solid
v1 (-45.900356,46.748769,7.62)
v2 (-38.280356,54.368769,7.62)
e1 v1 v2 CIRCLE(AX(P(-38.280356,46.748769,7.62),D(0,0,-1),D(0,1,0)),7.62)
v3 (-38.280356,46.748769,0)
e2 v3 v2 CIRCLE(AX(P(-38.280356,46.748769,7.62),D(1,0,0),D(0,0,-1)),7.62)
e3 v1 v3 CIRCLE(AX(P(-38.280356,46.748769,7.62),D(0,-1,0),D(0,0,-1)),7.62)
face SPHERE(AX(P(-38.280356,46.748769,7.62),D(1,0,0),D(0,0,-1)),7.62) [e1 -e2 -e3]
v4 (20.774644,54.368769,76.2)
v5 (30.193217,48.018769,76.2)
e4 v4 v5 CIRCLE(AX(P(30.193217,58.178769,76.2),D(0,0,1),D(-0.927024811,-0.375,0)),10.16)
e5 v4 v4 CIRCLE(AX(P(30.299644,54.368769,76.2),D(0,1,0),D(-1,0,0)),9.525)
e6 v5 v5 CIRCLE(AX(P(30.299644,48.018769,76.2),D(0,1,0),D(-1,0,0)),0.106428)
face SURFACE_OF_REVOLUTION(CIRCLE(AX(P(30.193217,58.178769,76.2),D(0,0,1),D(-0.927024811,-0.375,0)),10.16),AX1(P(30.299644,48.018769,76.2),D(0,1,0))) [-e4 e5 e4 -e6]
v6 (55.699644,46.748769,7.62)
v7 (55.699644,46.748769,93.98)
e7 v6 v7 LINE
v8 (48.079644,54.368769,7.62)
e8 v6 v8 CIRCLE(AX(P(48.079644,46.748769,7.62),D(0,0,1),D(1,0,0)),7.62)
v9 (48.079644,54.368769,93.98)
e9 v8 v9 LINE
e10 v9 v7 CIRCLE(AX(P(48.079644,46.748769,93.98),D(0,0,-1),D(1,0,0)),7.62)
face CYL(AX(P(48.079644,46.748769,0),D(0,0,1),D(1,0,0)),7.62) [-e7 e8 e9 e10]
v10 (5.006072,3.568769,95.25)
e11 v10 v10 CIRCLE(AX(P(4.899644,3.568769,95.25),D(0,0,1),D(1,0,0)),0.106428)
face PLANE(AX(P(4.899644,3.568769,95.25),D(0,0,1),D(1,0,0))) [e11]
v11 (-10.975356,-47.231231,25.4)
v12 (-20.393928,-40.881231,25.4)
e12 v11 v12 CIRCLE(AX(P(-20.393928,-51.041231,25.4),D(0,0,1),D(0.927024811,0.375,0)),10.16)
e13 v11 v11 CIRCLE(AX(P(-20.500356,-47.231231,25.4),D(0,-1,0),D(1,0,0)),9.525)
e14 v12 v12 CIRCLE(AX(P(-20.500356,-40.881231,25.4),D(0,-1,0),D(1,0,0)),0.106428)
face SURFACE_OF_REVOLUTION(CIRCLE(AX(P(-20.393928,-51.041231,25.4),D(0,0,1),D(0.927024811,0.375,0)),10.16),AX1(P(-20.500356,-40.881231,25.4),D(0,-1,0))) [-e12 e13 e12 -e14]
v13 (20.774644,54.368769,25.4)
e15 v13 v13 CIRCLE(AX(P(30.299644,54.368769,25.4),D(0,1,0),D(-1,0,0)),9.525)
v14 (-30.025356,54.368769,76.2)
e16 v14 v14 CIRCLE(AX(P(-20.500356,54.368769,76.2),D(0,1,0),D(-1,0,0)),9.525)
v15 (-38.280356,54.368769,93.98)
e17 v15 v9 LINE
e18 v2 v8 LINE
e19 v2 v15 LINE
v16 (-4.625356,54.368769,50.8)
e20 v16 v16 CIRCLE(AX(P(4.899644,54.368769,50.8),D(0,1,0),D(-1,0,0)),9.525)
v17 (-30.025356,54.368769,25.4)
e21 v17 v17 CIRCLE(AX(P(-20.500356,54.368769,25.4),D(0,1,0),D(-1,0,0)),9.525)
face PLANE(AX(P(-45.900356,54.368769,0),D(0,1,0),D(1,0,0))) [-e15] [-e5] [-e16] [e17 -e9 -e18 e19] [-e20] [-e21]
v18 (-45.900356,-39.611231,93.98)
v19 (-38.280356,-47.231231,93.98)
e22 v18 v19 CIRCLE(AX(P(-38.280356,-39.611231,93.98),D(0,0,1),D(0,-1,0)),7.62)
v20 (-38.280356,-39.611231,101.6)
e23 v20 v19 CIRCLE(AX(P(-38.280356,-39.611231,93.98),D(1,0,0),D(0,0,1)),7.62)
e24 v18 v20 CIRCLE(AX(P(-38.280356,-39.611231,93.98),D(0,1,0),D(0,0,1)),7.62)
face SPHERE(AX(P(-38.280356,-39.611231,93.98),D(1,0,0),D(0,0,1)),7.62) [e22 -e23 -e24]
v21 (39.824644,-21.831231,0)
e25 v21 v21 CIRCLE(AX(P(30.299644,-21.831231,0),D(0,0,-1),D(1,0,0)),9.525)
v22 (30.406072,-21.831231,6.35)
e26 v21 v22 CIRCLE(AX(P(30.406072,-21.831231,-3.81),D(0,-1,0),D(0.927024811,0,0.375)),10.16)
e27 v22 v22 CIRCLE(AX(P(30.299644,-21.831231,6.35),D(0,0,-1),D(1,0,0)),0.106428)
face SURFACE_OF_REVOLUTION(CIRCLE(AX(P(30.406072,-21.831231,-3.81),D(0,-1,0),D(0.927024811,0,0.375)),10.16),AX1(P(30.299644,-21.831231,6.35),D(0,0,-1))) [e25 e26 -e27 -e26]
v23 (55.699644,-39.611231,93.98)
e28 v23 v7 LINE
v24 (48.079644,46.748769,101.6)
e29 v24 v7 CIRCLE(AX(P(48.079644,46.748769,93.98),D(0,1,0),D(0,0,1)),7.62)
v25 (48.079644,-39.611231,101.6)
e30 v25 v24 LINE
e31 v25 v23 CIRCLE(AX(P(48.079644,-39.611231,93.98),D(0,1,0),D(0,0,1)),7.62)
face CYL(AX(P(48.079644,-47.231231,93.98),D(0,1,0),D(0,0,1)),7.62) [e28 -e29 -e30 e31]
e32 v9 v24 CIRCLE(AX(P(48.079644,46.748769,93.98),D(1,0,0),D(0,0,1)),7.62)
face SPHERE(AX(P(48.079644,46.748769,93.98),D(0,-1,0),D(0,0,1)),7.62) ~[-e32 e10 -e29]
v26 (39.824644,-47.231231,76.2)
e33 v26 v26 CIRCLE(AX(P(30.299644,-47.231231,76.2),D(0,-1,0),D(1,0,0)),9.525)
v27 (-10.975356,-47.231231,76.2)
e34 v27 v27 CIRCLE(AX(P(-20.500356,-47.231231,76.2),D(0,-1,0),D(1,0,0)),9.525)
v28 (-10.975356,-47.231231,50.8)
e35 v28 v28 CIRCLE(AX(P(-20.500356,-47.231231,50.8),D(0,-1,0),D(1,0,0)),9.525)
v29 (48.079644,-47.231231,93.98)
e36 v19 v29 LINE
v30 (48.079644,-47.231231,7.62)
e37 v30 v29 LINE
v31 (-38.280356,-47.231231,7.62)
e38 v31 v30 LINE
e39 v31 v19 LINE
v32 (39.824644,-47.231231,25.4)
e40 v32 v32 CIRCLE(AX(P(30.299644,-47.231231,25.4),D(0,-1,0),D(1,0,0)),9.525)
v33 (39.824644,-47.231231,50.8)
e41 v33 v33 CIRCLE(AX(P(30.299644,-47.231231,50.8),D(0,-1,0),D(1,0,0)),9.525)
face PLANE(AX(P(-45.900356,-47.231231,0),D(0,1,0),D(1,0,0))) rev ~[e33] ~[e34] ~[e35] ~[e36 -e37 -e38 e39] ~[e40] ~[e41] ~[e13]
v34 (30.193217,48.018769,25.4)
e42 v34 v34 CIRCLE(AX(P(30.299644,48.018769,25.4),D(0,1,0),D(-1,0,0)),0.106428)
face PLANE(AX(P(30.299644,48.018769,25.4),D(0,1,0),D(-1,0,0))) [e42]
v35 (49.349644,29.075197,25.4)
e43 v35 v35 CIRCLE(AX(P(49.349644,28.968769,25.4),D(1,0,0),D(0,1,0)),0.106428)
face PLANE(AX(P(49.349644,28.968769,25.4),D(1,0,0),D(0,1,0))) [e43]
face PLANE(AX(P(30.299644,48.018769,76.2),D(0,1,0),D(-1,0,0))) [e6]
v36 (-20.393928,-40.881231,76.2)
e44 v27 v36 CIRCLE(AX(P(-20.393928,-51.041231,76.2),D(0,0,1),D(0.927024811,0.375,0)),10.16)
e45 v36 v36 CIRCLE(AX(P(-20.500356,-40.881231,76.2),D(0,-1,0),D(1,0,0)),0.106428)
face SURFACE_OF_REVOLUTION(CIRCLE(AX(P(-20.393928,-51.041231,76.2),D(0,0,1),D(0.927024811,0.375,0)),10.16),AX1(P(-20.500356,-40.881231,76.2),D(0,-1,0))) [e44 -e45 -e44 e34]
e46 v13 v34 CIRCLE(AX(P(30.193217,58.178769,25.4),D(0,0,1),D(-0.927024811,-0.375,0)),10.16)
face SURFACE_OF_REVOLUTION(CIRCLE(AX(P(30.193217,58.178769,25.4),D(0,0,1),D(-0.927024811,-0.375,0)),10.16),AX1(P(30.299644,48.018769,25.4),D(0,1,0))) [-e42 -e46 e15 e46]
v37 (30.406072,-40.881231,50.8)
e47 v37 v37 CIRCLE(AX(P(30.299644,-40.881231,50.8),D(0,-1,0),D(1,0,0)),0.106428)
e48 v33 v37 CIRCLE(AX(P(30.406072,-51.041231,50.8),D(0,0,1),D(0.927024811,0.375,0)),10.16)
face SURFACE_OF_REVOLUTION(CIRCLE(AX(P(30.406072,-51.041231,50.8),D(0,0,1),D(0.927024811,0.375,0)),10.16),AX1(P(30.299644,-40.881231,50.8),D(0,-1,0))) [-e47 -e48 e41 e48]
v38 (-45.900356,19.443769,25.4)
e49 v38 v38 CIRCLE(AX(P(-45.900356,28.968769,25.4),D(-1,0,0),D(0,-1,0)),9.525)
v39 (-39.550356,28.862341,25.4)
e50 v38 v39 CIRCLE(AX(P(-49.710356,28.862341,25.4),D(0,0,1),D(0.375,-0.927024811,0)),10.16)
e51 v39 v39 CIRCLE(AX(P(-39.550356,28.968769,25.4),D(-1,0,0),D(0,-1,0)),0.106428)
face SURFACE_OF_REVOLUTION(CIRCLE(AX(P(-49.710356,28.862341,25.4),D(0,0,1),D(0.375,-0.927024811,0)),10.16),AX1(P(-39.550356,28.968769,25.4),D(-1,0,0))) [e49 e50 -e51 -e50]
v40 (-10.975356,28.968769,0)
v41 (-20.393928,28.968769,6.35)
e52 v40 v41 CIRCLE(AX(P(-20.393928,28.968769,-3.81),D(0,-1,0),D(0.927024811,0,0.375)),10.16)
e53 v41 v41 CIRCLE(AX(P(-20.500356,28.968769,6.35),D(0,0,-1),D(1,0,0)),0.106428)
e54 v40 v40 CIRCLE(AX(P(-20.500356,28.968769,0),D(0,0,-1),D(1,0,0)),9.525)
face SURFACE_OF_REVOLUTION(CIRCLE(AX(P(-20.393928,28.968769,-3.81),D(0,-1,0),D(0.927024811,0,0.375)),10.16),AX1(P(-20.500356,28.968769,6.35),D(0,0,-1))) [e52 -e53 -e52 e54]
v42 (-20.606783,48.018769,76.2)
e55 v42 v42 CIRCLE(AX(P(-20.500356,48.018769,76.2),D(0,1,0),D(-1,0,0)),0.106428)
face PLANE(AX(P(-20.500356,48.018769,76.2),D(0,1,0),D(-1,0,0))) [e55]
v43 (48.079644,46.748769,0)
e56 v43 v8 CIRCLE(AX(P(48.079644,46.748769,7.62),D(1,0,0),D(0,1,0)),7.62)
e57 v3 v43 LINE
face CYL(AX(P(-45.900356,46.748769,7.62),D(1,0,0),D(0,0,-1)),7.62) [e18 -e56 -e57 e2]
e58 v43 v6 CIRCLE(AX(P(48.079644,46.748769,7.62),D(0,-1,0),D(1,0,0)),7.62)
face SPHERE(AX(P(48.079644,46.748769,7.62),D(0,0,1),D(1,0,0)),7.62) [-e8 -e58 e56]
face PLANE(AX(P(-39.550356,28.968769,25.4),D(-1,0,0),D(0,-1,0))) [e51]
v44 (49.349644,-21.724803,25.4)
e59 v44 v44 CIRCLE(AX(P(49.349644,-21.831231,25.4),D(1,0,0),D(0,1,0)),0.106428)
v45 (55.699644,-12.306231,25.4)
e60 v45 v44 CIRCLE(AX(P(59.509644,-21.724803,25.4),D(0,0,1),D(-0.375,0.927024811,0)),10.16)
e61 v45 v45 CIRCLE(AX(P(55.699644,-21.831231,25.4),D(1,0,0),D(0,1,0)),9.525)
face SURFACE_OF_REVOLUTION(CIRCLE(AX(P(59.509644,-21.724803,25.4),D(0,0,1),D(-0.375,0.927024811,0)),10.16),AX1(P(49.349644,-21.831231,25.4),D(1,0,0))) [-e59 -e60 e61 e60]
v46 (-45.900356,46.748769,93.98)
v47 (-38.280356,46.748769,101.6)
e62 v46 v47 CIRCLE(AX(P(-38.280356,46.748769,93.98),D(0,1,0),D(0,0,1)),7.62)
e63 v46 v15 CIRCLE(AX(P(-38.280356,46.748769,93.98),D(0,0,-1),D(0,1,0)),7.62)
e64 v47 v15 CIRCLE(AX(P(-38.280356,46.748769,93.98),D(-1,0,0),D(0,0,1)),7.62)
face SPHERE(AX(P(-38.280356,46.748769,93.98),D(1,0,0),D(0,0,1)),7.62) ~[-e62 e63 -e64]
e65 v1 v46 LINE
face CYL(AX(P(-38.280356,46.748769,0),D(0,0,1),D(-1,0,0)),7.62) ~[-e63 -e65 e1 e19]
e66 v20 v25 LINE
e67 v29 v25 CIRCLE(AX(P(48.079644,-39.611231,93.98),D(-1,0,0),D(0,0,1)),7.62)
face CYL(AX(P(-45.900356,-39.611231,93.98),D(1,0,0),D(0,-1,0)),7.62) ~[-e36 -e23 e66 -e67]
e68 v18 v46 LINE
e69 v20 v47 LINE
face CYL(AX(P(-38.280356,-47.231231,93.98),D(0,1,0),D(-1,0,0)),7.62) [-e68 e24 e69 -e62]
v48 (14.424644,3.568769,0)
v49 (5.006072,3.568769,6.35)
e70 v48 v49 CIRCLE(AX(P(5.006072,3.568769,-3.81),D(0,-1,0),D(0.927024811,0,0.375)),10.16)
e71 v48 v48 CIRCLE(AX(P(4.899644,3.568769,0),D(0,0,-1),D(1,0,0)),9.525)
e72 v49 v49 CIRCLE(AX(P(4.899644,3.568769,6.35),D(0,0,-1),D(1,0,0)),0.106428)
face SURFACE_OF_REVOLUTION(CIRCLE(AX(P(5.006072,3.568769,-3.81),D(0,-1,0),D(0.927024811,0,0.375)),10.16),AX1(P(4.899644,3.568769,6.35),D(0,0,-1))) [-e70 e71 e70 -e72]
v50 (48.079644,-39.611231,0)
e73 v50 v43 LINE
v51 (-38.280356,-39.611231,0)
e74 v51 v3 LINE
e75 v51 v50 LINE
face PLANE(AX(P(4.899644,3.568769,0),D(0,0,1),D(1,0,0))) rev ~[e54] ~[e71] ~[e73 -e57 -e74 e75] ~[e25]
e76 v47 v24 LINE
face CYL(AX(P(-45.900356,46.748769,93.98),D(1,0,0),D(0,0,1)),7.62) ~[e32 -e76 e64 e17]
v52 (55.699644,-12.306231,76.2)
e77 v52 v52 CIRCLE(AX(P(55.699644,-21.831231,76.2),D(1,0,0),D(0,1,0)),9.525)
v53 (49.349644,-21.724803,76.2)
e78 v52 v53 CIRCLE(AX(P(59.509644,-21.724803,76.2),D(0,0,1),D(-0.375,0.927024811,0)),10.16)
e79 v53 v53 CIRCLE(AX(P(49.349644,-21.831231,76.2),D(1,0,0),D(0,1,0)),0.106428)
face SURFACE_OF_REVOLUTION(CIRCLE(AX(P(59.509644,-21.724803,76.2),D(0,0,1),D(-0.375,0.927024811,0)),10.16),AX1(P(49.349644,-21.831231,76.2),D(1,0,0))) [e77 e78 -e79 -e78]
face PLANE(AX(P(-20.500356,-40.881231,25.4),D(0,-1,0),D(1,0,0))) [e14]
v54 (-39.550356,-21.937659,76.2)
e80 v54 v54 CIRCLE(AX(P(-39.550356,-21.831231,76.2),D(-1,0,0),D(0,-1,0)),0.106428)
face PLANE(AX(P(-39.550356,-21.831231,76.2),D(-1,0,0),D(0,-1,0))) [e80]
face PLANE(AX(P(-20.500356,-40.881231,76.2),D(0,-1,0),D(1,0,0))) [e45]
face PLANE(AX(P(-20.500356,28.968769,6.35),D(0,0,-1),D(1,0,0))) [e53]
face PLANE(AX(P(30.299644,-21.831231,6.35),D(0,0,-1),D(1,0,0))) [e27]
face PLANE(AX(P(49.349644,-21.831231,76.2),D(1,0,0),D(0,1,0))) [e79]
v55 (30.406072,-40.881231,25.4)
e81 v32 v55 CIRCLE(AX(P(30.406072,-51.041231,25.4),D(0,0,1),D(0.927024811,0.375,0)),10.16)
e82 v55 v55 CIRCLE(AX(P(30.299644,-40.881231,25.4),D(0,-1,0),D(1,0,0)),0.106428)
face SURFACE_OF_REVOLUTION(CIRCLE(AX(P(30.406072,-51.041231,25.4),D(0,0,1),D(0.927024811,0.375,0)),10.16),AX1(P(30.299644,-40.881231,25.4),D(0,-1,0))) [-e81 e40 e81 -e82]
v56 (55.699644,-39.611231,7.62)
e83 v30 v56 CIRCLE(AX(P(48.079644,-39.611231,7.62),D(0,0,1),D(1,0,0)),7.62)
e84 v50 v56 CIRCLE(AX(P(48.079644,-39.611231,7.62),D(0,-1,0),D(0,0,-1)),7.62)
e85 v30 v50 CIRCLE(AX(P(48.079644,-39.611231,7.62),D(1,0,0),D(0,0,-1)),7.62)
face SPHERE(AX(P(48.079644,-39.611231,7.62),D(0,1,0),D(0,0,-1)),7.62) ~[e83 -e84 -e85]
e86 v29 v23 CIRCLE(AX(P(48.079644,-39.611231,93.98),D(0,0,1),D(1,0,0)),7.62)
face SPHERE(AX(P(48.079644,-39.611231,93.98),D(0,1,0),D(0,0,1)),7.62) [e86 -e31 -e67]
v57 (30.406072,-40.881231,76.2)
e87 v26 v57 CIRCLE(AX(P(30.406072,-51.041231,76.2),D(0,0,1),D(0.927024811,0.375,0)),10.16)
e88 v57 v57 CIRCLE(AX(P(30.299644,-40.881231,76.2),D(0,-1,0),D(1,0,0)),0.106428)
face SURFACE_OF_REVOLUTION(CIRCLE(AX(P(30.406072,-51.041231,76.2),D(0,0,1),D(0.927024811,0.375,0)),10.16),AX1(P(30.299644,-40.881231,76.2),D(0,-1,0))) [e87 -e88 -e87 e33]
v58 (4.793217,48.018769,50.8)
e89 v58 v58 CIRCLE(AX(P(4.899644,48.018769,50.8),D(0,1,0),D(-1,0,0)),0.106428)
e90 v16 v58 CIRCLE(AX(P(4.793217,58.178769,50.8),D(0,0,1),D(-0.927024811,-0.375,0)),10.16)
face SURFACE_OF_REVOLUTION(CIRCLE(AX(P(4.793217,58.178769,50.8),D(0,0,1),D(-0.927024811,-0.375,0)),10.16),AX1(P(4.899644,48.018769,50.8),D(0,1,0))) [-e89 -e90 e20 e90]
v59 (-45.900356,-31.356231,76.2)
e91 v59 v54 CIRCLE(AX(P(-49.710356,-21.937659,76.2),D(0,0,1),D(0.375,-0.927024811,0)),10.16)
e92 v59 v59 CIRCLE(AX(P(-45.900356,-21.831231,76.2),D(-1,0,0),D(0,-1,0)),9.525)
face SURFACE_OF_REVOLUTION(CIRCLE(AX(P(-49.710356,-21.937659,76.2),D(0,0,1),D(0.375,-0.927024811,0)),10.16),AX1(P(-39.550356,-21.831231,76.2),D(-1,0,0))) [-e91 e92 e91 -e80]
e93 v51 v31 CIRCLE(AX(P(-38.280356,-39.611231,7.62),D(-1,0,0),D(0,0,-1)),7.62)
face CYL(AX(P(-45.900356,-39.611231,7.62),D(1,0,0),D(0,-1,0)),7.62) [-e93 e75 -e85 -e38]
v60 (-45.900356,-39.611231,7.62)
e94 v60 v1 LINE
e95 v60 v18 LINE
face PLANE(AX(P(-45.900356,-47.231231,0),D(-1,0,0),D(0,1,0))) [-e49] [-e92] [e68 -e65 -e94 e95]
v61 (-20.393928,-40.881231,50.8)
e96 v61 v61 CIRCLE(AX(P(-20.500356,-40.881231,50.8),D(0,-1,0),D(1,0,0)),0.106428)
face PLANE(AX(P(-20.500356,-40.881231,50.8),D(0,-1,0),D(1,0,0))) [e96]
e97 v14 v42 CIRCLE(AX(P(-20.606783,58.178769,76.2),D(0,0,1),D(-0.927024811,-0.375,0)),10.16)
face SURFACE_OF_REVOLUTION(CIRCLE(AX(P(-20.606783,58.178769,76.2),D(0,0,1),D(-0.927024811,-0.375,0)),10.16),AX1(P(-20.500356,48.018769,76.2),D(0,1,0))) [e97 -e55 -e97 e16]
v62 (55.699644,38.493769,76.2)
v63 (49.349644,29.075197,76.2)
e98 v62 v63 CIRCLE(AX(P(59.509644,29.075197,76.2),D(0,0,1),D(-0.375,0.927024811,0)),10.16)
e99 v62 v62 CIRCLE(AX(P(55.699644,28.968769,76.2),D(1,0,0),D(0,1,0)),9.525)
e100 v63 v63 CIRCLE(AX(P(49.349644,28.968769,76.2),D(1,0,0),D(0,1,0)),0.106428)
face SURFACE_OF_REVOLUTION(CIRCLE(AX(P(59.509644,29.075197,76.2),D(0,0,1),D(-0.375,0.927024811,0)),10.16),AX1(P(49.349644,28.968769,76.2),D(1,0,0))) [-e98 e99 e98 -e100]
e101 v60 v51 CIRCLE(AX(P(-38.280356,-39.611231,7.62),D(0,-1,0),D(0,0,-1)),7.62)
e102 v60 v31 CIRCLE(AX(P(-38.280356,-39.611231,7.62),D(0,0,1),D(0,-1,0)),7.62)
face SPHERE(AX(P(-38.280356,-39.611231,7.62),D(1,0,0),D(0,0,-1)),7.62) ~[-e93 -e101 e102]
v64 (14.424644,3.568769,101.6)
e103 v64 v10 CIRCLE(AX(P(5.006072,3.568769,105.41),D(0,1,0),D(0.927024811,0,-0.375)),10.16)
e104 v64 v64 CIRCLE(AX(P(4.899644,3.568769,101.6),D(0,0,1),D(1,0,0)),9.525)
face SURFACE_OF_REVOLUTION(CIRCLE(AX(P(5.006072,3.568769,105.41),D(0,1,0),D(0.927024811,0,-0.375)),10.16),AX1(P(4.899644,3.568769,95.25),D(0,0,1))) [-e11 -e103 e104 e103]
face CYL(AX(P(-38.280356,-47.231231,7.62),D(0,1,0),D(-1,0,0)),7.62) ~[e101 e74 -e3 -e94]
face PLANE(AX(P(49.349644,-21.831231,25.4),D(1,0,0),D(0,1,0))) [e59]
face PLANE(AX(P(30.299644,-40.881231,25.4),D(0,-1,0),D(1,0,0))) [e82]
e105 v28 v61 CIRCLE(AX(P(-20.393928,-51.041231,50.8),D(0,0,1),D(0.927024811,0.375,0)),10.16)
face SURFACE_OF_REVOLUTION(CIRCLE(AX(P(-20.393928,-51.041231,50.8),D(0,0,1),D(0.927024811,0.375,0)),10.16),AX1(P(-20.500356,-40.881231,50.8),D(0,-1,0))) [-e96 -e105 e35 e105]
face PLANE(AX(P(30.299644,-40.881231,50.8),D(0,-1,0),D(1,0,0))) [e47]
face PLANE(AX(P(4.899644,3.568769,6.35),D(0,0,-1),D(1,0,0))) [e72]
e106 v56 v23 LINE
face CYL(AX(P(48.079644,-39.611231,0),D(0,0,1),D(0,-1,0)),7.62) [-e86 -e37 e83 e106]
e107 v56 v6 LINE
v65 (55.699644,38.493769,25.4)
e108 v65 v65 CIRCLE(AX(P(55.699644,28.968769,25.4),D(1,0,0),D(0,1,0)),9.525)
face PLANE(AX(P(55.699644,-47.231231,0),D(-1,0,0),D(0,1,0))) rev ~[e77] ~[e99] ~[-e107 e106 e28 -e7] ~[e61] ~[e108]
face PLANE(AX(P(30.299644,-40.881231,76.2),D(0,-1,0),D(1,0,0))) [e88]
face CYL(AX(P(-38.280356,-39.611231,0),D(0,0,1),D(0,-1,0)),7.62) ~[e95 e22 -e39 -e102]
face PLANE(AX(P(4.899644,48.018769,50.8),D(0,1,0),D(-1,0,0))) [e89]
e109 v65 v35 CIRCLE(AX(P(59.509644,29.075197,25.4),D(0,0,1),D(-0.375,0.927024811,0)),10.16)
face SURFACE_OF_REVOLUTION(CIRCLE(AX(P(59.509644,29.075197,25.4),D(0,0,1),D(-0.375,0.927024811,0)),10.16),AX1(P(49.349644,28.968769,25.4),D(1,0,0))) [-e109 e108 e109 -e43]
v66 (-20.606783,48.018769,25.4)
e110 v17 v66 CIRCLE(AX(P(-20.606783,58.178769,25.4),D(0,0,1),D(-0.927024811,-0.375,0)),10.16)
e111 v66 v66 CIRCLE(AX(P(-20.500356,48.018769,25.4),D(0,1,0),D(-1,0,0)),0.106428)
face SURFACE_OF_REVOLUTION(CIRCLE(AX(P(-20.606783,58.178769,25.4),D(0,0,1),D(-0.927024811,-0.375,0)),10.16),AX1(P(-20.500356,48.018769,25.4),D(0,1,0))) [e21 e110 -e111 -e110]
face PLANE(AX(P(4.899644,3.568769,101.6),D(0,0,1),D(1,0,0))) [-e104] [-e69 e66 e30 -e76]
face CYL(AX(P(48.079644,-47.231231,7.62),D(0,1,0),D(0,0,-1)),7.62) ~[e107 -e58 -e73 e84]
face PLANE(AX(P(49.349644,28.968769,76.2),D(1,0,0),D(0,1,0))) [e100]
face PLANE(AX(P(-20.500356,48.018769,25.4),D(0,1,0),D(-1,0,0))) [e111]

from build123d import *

# Parameters (mm, degrees)
F0_W      = 101.6
F0_H      = 101.6
F0_R      = 9.525
F1_DEPTH  = 101.6
F2_R      = 9.525
F3_DEPTH  = 6.35
F5_R      = 9.525
F6_DEPTH  = 6.35
F8_R      = 9.525
F9_DEPTH  = 6.35
F11_R     = 9.525
F12_DEPTH = 6.35
F14_R     = 9.525
F15_DEPTH = 6.35
F17_R     = 9.525
F18_DEPTH = 6.35
F20_R     = 7.62


# Not quite as in the source:
# - a fillet or chamfer that OpenCascade refuses, or shapes differently, is made with other operations: its cross-section is extruded or revolved along the edge and cut away or added


with BuildPart() as f1:
    # F0 (on Top) → F1 (new body)
    with BuildSketch(Plane.XY):
        with Locations((4.8996444777, 3.5687691152)):
            Rectangle(F0_W, F0_H)
        with Locations((4.8996444777, 3.5687691152)):
            Circle(F0_R, mode=Mode.SUBTRACT)
        with Locations((4.8996444777, 3.5687691152)):
            Circle(F0_R)
    extrude(amount=F1_DEPTH)

    # F2 (on face) → F3 (cut)
    with BuildSketch(Plane.XY.offset(101.6)):
        with Locations((4.8996444777, 3.5687691152)):
            Circle(F2_R)
    extrude(amount=-F3_DEPTH, mode=Mode.SUBTRACT)

    # F4: fillet of radius 10.16 on 1 edges, made by hand

    # F4_s1 → F4_t2 (revolve)
    with BuildSketch(Plane.XZ.offset(-3.5687691152)):
        with BuildLine():
            ThreePointArc((14.4246444777, 101.6), (10.685685062, 96.9857730325), (5.0060723991, 95.25))
            Line((5.0060723991, 95.25), (14.4246444777, 95.25))
            Line((14.4246444777, 95.25), (14.4246444777, 101.6))
        make_face()
    revolve(axis=Axis((4.8996444777, 3.5687691152, 95.25), (0, 0, 1)))

    # F5 (on face) → F6 (cut)
    with BuildSketch(Plane(origin=(-45.9003555223, 0, 0), x_dir=(0, -1, 0), z_dir=(-1, 0, 0))):
        with Locations((-28.9687691152, 25.4)):
            Circle(F5_R)
        with Locations((21.8312308848, 76.2)):
            Circle(F5_R)
    extrude(amount=-F6_DEPTH, mode=Mode.SUBTRACT)

    # F7: fillet of radius 10.16 on 2 edges, made by hand

    # F7_s1 → F7_t2 (revolve)
    with BuildSketch(Plane.XY.offset(25.4)):
        with BuildLine():
            ThreePointArc((-45.9003555223, 19.4437691152), (-41.2861285547, 23.182728531), (-39.5503555223, 28.8623411938))
            Line((-39.5503555223, 28.8623411938), (-39.5503555223, 19.4437691152))
            Line((-39.5503555223, 19.4437691152), (-45.9003555223, 19.4437691152))
        make_face()
    revolve(axis=Axis((-39.5503555223, 28.9687691152, 25.4), (-1, 0, 0)))

    # F7_s3 → F7_t4 (revolve)
    with BuildSketch(Plane.XY.offset(76.2)):
        with BuildLine():
            ThreePointArc((-45.9003555223, -31.3562308848), (-41.2861285547, -27.617271469), (-39.5503555223, -21.9376588062))
            Line((-39.5503555223, -21.9376588062), (-39.5503555223, -31.3562308848))
            Line((-39.5503555223, -31.3562308848), (-45.9003555223, -31.3562308848))
        make_face()
    revolve(axis=Axis((-39.5503555223, -21.8312308848, 76.2), (-1, 0, 0)))

    # F8 (on face) → F9 (cut)
    with BuildSketch(Plane(origin=(0, 0, 0), x_dir=(1, 0, 0), z_dir=(0, 0, -1))):
        with Locations((4.8996444777, -3.5687691152)):
            Circle(F8_R)
        with Locations((30.2996444777, 21.8312308848)):
            Circle(F8_R)
        with Locations((-20.5003555223, -28.9687691152)):
            Circle(F8_R)
    extrude(amount=-F9_DEPTH, mode=Mode.SUBTRACT)

    # F10: fillet of radius 10.16 on 3 edges, made by hand

    # F10_s1 → F10_t2 (revolve)
    with BuildSketch(Plane.XZ.offset(-28.9687691152)):
        with BuildLine():
            ThreePointArc((-10.9753555223, 0), (-14.714314938, 4.6142269675), (-20.3939276009, 6.35))
            Line((-20.3939276009, 6.35), (-10.9753555223, 6.35))
            Line((-10.9753555223, 6.35), (-10.9753555223, 0))
        make_face()
    revolve(axis=Axis((-20.5003555223, 28.9687691152, 6.35), (0, 0, -1)))

    # F10_s3 → F10_t4 (revolve)
    with BuildSketch(Plane.XZ.offset(-3.5687691152)):
        with BuildLine():
            ThreePointArc((14.4246444777, 0), (10.685685062, 4.6142269675), (5.0060723991, 6.35))
            Line((5.0060723991, 6.35), (14.4246444777, 6.35))
            Line((14.4246444777, 6.35), (14.4246444777, 0))
        make_face()
    revolve(axis=Axis((4.8996444777, 3.5687691152, 6.35), (0, 0, -1)))

    # F10_s5 → F10_t6 (revolve)
    with BuildSketch(Plane.XZ.offset(21.8312308848)):
        with BuildLine():
            ThreePointArc((39.8246444777, 0), (36.085685062, 4.6142269675), (30.4060723991, 6.35))
            Line((30.4060723991, 6.35), (39.8246444777, 6.35))
            Line((39.8246444777, 6.35), (39.8246444777, 0))
        make_face()
    revolve(axis=Axis((30.2996444777, -21.8312308848, 6.35), (0, 0, -1)))

    # F11 (on face) → F12 (cut)
    with BuildSketch(Plane.YZ.offset(55.6996444777)):
        with Locations((-21.8312308848, 25.4)):
            Circle(F11_R)
        with Locations((-21.8312308848, 76.2)):
            Circle(F11_R)
        with Locations((28.9687691152, 25.4)):
            Circle(F11_R)
        with Locations((28.9687691152, 76.2)):
            Circle(F11_R)
    extrude(amount=-F12_DEPTH, mode=Mode.SUBTRACT)

    # F13: fillet of radius 10.16 on 4 edges, made by hand

    # F13_s1 → F13_t2 (revolve)
    with BuildSketch(Plane.XY.offset(25.4)):
        with BuildLine():
            ThreePointArc((55.6996444777, 38.4937691152), (51.0854175102, 34.7548096994), (49.3496444777, 29.0751970366))
            Line((49.3496444777, 29.0751970366), (49.3496444777, 38.4937691152))
            Line((49.3496444777, 38.4937691152), (55.6996444777, 38.4937691152))
        make_face()
    revolve(axis=Axis((49.3496444777, 28.9687691152, 25.4), (1, 0, 0)))

    # F13_s3 → F13_t4 (revolve)
    with BuildSketch(Plane.XY.offset(76.2)):
        with BuildLine():
            ThreePointArc((55.6996444777, 38.4937691152), (51.0854175102, 34.7548096994), (49.3496444777, 29.0751970366))
            Line((49.3496444777, 29.0751970366), (49.3496444777, 38.4937691152))
            Line((49.3496444777, 38.4937691152), (55.6996444777, 38.4937691152))
        make_face()
    revolve(axis=Axis((49.3496444777, 28.9687691152, 76.2), (1, 0, 0)))

    # F13_s5 → F13_t6 (revolve)
    with BuildSketch(Plane.XY.offset(76.2)):
        with BuildLine():
            ThreePointArc((55.6996444777, -12.3062308848), (51.0854175102, -16.0451903006), (49.3496444777, -21.7248029634))
            Line((49.3496444777, -21.7248029634), (49.3496444777, -12.3062308848))
            Line((49.3496444777, -12.3062308848), (55.6996444777, -12.3062308848))
        make_face()
    revolve(axis=Axis((49.3496444777, -21.8312308848, 76.2), (1, 0, 0)))

    # F13_s7 → F13_t8 (revolve)
    with BuildSketch(Plane.XY.offset(25.4)):
        with BuildLine():
            ThreePointArc((55.6996444777, -12.3062308848), (51.0854175102, -16.0451903006), (49.3496444777, -21.7248029634))
            Line((49.3496444777, -21.7248029634), (49.3496444777, -12.3062308848))
            Line((49.3496444777, -12.3062308848), (55.6996444777, -12.3062308848))
        make_face()
    revolve(axis=Axis((49.3496444777, -21.8312308848, 25.4), (1, 0, 0)))

    # F14 (on face) → F15 (cut)
    with BuildSketch(Plane(origin=(0, 54.3687691152, 0), x_dir=(-1, 0, 0), z_dir=(0, 1, 0))):
        with Locations((-4.8996444777, 50.8)):
            Circle(F14_R)
        with Locations((-30.2996444777, 25.4)):
            Circle(F14_R)
        with Locations((20.5003555223, 76.2)):
            Circle(F14_R)
        with Locations((-30.2996444777, 76.2)):
            Circle(F14_R)
        with Locations((20.5003555223, 25.4)):
            Circle(F14_R)
    extrude(amount=-F15_DEPTH, mode=Mode.SUBTRACT)

    # F16: fillet of radius 10.16 on 5 edges, made by hand

    # F16_s1 → F16_t2 (revolve)
    with BuildSketch(Plane.XY.offset(25.4)):
        with BuildLine():
            ThreePointArc((-30.0253555223, 54.3687691152), (-26.2863961065, 49.7545421477), (-20.6067834436, 48.0187691152))
            Line((-20.6067834436, 48.0187691152), (-30.0253555223, 48.0187691152))
            Line((-30.0253555223, 48.0187691152), (-30.0253555223, 54.3687691152))
        make_face()
    revolve(axis=Axis((-20.5003555223, 48.0187691152, 25.4), (0, 1, 0)))

    # F16_s3 → F16_t4 (revolve)
    with BuildSketch(Plane.XY.offset(50.8)):
        with BuildLine():
            ThreePointArc((-4.6253555223, 54.3687691152), (-0.8863961065, 49.7545421477), (4.7932165564, 48.0187691152))
            Line((4.7932165564, 48.0187691152), (-4.6253555223, 48.0187691152))
            Line((-4.6253555223, 48.0187691152), (-4.6253555223, 54.3687691152))
        make_face()
    revolve(axis=Axis((4.8996444777, 48.0187691152, 50.8), (0, 1, 0)))

    # F16_s5 → F16_t6 (revolve)
    with BuildSketch(Plane.XY.offset(76.2)):
        with BuildLine():
            ThreePointArc((-30.0253555223, 54.3687691152), (-26.2863961065, 49.7545421477), (-20.6067834436, 48.0187691152))
            Line((-20.6067834436, 48.0187691152), (-30.0253555223, 48.0187691152))
            Line((-30.0253555223, 48.0187691152), (-30.0253555223, 54.3687691152))
        make_face()
    revolve(axis=Axis((-20.5003555223, 48.0187691152, 76.2), (0, 1, 0)))

    # F16_s7 → F16_t8 (revolve)
    with BuildSketch(Plane.XY.offset(76.2)):
        with BuildLine():
            ThreePointArc((20.7746444777, 54.3687691152), (24.5136038935, 49.7545421477), (30.1932165564, 48.0187691152))
            Line((30.1932165564, 48.0187691152), (20.7746444777, 48.0187691152))
            Line((20.7746444777, 48.0187691152), (20.7746444777, 54.3687691152))
        make_face()
    revolve(axis=Axis((30.2996444777, 48.0187691152, 76.2), (0, 1, 0)))

    # F16_s9 → F16_t10 (revolve)
    with BuildSketch(Plane.XY.offset(25.4)):
        with BuildLine():
            ThreePointArc((20.7746444777, 54.3687691152), (24.5136038935, 49.7545421477), (30.1932165564, 48.0187691152))
            Line((30.1932165564, 48.0187691152), (20.7746444777, 48.0187691152))
            Line((20.7746444777, 48.0187691152), (20.7746444777, 54.3687691152))
        make_face()
    revolve(axis=Axis((30.2996444777, 48.0187691152, 25.4), (0, 1, 0)))

    # F17 (on face) → F18 (cut)
    with BuildSketch(Plane.XZ.offset(47.2312308848)):
        with Locations((30.2996444777, 25.4)):
            Circle(F17_R)
        with Locations((30.2996444777, 50.8)):
            Circle(F17_R)
        with Locations((30.2996444777, 76.2)):
            Circle(F17_R)
        with Locations((-20.5003555223, 25.4)):
            Circle(F17_R)
        with Locations((-20.5003555223, 50.8)):
            Circle(F17_R)
        with Locations((-20.5003555223, 76.2)):
            Circle(F17_R)
    extrude(amount=-F18_DEPTH, mode=Mode.SUBTRACT)

    # F19: fillet of radius 10.16 on 6 edges, made by hand

    # F19_s1 → F19_t2 (revolve)
    with BuildSketch(Plane.XY.offset(25.4)):
        with BuildLine():
            ThreePointArc((39.8246444777, -47.2312308848), (36.085685062, -42.6170039173), (30.4060723991, -40.8812308848))
            Line((30.4060723991, -40.8812308848), (39.8246444777, -40.8812308848))
            Line((39.8246444777, -40.8812308848), (39.8246444777, -47.2312308848))
        make_face()
    revolve(axis=Axis((30.2996444777, -40.8812308848, 25.4), (0, -1, 0)))

    # F19_s3 → F19_t4 (revolve)
    with BuildSketch(Plane.XY.offset(50.8)):
        with BuildLine():
            ThreePointArc((39.8246444777, -47.2312308848), (36.085685062, -42.6170039173), (30.4060723991, -40.8812308848))
            Line((30.4060723991, -40.8812308848), (39.8246444777, -40.8812308848))
            Line((39.8246444777, -40.8812308848), (39.8246444777, -47.2312308848))
        make_face()
    revolve(axis=Axis((30.2996444777, -40.8812308848, 50.8), (0, -1, 0)))

    # F19_s5 → F19_t6 (revolve)
    with BuildSketch(Plane.XY.offset(76.2)):
        with BuildLine():
            ThreePointArc((39.8246444777, -47.2312308848), (36.085685062, -42.6170039173), (30.4060723991, -40.8812308848))
            Line((30.4060723991, -40.8812308848), (39.8246444777, -40.8812308848))
            Line((39.8246444777, -40.8812308848), (39.8246444777, -47.2312308848))
        make_face()
    revolve(axis=Axis((30.2996444777, -40.8812308848, 76.2), (0, -1, 0)))

    # F19_s7 → F19_t8 (revolve)
    with BuildSketch(Plane.XY.offset(76.2)):
        with BuildLine():
            ThreePointArc((-10.9753555223, -47.2312308848), (-14.714314938, -42.6170039173), (-20.3939276009, -40.8812308848))
            Line((-20.3939276009, -40.8812308848), (-10.9753555223, -40.8812308848))
            Line((-10.9753555223, -40.8812308848), (-10.9753555223, -47.2312308848))
        make_face()
    revolve(axis=Axis((-20.5003555223, -40.8812308848, 76.2), (0, -1, 0)))

    # F19_s9 → F19_t10 (revolve)
    with BuildSketch(Plane.XY.offset(50.8)):
        with BuildLine():
            ThreePointArc((-10.9753555223, -47.2312308848), (-14.714314938, -42.6170039173), (-20.3939276009, -40.8812308848))
            Line((-20.3939276009, -40.8812308848), (-10.9753555223, -40.8812308848))
            Line((-10.9753555223, -40.8812308848), (-10.9753555223, -47.2312308848))
        make_face()
    revolve(axis=Axis((-20.5003555223, -40.8812308848, 50.8), (0, -1, 0)))

    # F19_s11 → F19_t12 (revolve)
    with BuildSketch(Plane.XY.offset(25.4)):
        with BuildLine():
            ThreePointArc((-10.9753555223, -47.2312308848), (-14.714314938, -42.6170039173), (-20.3939276009, -40.8812308848))
            Line((-20.3939276009, -40.8812308848), (-10.9753555223, -40.8812308848))
            Line((-10.9753555223, -40.8812308848), (-10.9753555223, -47.2312308848))
        make_face()
    revolve(axis=Axis((-20.5003555223, -40.8812308848, 25.4), (0, -1, 0)))

    # F20
    f20_edges = [f1.edges().sort_by_distance(p)[0] for p in [
        (55.699644, 3.568769, 101.6),
        (4.899644, 54.368769, 101.6),
        (55.699644, 54.368769, 50.8),
        (4.899644, -47.231231, 101.6),
        (-45.900356, 3.568769, 101.6),
        (55.699644, 3.568769, 0),
        (4.899644, 54.368769, 0),
        (4.899644, -47.231231, 0),
        (-45.900356, 3.568769, 0),
        (55.699644, -47.231231, 50.8),
        (-45.900356, -47.231231, 50.8),
        (-45.900356, 54.368769, 50.8),
    ]]
    fillet(f20_edges, radius=F20_R)


solid = f1.part
